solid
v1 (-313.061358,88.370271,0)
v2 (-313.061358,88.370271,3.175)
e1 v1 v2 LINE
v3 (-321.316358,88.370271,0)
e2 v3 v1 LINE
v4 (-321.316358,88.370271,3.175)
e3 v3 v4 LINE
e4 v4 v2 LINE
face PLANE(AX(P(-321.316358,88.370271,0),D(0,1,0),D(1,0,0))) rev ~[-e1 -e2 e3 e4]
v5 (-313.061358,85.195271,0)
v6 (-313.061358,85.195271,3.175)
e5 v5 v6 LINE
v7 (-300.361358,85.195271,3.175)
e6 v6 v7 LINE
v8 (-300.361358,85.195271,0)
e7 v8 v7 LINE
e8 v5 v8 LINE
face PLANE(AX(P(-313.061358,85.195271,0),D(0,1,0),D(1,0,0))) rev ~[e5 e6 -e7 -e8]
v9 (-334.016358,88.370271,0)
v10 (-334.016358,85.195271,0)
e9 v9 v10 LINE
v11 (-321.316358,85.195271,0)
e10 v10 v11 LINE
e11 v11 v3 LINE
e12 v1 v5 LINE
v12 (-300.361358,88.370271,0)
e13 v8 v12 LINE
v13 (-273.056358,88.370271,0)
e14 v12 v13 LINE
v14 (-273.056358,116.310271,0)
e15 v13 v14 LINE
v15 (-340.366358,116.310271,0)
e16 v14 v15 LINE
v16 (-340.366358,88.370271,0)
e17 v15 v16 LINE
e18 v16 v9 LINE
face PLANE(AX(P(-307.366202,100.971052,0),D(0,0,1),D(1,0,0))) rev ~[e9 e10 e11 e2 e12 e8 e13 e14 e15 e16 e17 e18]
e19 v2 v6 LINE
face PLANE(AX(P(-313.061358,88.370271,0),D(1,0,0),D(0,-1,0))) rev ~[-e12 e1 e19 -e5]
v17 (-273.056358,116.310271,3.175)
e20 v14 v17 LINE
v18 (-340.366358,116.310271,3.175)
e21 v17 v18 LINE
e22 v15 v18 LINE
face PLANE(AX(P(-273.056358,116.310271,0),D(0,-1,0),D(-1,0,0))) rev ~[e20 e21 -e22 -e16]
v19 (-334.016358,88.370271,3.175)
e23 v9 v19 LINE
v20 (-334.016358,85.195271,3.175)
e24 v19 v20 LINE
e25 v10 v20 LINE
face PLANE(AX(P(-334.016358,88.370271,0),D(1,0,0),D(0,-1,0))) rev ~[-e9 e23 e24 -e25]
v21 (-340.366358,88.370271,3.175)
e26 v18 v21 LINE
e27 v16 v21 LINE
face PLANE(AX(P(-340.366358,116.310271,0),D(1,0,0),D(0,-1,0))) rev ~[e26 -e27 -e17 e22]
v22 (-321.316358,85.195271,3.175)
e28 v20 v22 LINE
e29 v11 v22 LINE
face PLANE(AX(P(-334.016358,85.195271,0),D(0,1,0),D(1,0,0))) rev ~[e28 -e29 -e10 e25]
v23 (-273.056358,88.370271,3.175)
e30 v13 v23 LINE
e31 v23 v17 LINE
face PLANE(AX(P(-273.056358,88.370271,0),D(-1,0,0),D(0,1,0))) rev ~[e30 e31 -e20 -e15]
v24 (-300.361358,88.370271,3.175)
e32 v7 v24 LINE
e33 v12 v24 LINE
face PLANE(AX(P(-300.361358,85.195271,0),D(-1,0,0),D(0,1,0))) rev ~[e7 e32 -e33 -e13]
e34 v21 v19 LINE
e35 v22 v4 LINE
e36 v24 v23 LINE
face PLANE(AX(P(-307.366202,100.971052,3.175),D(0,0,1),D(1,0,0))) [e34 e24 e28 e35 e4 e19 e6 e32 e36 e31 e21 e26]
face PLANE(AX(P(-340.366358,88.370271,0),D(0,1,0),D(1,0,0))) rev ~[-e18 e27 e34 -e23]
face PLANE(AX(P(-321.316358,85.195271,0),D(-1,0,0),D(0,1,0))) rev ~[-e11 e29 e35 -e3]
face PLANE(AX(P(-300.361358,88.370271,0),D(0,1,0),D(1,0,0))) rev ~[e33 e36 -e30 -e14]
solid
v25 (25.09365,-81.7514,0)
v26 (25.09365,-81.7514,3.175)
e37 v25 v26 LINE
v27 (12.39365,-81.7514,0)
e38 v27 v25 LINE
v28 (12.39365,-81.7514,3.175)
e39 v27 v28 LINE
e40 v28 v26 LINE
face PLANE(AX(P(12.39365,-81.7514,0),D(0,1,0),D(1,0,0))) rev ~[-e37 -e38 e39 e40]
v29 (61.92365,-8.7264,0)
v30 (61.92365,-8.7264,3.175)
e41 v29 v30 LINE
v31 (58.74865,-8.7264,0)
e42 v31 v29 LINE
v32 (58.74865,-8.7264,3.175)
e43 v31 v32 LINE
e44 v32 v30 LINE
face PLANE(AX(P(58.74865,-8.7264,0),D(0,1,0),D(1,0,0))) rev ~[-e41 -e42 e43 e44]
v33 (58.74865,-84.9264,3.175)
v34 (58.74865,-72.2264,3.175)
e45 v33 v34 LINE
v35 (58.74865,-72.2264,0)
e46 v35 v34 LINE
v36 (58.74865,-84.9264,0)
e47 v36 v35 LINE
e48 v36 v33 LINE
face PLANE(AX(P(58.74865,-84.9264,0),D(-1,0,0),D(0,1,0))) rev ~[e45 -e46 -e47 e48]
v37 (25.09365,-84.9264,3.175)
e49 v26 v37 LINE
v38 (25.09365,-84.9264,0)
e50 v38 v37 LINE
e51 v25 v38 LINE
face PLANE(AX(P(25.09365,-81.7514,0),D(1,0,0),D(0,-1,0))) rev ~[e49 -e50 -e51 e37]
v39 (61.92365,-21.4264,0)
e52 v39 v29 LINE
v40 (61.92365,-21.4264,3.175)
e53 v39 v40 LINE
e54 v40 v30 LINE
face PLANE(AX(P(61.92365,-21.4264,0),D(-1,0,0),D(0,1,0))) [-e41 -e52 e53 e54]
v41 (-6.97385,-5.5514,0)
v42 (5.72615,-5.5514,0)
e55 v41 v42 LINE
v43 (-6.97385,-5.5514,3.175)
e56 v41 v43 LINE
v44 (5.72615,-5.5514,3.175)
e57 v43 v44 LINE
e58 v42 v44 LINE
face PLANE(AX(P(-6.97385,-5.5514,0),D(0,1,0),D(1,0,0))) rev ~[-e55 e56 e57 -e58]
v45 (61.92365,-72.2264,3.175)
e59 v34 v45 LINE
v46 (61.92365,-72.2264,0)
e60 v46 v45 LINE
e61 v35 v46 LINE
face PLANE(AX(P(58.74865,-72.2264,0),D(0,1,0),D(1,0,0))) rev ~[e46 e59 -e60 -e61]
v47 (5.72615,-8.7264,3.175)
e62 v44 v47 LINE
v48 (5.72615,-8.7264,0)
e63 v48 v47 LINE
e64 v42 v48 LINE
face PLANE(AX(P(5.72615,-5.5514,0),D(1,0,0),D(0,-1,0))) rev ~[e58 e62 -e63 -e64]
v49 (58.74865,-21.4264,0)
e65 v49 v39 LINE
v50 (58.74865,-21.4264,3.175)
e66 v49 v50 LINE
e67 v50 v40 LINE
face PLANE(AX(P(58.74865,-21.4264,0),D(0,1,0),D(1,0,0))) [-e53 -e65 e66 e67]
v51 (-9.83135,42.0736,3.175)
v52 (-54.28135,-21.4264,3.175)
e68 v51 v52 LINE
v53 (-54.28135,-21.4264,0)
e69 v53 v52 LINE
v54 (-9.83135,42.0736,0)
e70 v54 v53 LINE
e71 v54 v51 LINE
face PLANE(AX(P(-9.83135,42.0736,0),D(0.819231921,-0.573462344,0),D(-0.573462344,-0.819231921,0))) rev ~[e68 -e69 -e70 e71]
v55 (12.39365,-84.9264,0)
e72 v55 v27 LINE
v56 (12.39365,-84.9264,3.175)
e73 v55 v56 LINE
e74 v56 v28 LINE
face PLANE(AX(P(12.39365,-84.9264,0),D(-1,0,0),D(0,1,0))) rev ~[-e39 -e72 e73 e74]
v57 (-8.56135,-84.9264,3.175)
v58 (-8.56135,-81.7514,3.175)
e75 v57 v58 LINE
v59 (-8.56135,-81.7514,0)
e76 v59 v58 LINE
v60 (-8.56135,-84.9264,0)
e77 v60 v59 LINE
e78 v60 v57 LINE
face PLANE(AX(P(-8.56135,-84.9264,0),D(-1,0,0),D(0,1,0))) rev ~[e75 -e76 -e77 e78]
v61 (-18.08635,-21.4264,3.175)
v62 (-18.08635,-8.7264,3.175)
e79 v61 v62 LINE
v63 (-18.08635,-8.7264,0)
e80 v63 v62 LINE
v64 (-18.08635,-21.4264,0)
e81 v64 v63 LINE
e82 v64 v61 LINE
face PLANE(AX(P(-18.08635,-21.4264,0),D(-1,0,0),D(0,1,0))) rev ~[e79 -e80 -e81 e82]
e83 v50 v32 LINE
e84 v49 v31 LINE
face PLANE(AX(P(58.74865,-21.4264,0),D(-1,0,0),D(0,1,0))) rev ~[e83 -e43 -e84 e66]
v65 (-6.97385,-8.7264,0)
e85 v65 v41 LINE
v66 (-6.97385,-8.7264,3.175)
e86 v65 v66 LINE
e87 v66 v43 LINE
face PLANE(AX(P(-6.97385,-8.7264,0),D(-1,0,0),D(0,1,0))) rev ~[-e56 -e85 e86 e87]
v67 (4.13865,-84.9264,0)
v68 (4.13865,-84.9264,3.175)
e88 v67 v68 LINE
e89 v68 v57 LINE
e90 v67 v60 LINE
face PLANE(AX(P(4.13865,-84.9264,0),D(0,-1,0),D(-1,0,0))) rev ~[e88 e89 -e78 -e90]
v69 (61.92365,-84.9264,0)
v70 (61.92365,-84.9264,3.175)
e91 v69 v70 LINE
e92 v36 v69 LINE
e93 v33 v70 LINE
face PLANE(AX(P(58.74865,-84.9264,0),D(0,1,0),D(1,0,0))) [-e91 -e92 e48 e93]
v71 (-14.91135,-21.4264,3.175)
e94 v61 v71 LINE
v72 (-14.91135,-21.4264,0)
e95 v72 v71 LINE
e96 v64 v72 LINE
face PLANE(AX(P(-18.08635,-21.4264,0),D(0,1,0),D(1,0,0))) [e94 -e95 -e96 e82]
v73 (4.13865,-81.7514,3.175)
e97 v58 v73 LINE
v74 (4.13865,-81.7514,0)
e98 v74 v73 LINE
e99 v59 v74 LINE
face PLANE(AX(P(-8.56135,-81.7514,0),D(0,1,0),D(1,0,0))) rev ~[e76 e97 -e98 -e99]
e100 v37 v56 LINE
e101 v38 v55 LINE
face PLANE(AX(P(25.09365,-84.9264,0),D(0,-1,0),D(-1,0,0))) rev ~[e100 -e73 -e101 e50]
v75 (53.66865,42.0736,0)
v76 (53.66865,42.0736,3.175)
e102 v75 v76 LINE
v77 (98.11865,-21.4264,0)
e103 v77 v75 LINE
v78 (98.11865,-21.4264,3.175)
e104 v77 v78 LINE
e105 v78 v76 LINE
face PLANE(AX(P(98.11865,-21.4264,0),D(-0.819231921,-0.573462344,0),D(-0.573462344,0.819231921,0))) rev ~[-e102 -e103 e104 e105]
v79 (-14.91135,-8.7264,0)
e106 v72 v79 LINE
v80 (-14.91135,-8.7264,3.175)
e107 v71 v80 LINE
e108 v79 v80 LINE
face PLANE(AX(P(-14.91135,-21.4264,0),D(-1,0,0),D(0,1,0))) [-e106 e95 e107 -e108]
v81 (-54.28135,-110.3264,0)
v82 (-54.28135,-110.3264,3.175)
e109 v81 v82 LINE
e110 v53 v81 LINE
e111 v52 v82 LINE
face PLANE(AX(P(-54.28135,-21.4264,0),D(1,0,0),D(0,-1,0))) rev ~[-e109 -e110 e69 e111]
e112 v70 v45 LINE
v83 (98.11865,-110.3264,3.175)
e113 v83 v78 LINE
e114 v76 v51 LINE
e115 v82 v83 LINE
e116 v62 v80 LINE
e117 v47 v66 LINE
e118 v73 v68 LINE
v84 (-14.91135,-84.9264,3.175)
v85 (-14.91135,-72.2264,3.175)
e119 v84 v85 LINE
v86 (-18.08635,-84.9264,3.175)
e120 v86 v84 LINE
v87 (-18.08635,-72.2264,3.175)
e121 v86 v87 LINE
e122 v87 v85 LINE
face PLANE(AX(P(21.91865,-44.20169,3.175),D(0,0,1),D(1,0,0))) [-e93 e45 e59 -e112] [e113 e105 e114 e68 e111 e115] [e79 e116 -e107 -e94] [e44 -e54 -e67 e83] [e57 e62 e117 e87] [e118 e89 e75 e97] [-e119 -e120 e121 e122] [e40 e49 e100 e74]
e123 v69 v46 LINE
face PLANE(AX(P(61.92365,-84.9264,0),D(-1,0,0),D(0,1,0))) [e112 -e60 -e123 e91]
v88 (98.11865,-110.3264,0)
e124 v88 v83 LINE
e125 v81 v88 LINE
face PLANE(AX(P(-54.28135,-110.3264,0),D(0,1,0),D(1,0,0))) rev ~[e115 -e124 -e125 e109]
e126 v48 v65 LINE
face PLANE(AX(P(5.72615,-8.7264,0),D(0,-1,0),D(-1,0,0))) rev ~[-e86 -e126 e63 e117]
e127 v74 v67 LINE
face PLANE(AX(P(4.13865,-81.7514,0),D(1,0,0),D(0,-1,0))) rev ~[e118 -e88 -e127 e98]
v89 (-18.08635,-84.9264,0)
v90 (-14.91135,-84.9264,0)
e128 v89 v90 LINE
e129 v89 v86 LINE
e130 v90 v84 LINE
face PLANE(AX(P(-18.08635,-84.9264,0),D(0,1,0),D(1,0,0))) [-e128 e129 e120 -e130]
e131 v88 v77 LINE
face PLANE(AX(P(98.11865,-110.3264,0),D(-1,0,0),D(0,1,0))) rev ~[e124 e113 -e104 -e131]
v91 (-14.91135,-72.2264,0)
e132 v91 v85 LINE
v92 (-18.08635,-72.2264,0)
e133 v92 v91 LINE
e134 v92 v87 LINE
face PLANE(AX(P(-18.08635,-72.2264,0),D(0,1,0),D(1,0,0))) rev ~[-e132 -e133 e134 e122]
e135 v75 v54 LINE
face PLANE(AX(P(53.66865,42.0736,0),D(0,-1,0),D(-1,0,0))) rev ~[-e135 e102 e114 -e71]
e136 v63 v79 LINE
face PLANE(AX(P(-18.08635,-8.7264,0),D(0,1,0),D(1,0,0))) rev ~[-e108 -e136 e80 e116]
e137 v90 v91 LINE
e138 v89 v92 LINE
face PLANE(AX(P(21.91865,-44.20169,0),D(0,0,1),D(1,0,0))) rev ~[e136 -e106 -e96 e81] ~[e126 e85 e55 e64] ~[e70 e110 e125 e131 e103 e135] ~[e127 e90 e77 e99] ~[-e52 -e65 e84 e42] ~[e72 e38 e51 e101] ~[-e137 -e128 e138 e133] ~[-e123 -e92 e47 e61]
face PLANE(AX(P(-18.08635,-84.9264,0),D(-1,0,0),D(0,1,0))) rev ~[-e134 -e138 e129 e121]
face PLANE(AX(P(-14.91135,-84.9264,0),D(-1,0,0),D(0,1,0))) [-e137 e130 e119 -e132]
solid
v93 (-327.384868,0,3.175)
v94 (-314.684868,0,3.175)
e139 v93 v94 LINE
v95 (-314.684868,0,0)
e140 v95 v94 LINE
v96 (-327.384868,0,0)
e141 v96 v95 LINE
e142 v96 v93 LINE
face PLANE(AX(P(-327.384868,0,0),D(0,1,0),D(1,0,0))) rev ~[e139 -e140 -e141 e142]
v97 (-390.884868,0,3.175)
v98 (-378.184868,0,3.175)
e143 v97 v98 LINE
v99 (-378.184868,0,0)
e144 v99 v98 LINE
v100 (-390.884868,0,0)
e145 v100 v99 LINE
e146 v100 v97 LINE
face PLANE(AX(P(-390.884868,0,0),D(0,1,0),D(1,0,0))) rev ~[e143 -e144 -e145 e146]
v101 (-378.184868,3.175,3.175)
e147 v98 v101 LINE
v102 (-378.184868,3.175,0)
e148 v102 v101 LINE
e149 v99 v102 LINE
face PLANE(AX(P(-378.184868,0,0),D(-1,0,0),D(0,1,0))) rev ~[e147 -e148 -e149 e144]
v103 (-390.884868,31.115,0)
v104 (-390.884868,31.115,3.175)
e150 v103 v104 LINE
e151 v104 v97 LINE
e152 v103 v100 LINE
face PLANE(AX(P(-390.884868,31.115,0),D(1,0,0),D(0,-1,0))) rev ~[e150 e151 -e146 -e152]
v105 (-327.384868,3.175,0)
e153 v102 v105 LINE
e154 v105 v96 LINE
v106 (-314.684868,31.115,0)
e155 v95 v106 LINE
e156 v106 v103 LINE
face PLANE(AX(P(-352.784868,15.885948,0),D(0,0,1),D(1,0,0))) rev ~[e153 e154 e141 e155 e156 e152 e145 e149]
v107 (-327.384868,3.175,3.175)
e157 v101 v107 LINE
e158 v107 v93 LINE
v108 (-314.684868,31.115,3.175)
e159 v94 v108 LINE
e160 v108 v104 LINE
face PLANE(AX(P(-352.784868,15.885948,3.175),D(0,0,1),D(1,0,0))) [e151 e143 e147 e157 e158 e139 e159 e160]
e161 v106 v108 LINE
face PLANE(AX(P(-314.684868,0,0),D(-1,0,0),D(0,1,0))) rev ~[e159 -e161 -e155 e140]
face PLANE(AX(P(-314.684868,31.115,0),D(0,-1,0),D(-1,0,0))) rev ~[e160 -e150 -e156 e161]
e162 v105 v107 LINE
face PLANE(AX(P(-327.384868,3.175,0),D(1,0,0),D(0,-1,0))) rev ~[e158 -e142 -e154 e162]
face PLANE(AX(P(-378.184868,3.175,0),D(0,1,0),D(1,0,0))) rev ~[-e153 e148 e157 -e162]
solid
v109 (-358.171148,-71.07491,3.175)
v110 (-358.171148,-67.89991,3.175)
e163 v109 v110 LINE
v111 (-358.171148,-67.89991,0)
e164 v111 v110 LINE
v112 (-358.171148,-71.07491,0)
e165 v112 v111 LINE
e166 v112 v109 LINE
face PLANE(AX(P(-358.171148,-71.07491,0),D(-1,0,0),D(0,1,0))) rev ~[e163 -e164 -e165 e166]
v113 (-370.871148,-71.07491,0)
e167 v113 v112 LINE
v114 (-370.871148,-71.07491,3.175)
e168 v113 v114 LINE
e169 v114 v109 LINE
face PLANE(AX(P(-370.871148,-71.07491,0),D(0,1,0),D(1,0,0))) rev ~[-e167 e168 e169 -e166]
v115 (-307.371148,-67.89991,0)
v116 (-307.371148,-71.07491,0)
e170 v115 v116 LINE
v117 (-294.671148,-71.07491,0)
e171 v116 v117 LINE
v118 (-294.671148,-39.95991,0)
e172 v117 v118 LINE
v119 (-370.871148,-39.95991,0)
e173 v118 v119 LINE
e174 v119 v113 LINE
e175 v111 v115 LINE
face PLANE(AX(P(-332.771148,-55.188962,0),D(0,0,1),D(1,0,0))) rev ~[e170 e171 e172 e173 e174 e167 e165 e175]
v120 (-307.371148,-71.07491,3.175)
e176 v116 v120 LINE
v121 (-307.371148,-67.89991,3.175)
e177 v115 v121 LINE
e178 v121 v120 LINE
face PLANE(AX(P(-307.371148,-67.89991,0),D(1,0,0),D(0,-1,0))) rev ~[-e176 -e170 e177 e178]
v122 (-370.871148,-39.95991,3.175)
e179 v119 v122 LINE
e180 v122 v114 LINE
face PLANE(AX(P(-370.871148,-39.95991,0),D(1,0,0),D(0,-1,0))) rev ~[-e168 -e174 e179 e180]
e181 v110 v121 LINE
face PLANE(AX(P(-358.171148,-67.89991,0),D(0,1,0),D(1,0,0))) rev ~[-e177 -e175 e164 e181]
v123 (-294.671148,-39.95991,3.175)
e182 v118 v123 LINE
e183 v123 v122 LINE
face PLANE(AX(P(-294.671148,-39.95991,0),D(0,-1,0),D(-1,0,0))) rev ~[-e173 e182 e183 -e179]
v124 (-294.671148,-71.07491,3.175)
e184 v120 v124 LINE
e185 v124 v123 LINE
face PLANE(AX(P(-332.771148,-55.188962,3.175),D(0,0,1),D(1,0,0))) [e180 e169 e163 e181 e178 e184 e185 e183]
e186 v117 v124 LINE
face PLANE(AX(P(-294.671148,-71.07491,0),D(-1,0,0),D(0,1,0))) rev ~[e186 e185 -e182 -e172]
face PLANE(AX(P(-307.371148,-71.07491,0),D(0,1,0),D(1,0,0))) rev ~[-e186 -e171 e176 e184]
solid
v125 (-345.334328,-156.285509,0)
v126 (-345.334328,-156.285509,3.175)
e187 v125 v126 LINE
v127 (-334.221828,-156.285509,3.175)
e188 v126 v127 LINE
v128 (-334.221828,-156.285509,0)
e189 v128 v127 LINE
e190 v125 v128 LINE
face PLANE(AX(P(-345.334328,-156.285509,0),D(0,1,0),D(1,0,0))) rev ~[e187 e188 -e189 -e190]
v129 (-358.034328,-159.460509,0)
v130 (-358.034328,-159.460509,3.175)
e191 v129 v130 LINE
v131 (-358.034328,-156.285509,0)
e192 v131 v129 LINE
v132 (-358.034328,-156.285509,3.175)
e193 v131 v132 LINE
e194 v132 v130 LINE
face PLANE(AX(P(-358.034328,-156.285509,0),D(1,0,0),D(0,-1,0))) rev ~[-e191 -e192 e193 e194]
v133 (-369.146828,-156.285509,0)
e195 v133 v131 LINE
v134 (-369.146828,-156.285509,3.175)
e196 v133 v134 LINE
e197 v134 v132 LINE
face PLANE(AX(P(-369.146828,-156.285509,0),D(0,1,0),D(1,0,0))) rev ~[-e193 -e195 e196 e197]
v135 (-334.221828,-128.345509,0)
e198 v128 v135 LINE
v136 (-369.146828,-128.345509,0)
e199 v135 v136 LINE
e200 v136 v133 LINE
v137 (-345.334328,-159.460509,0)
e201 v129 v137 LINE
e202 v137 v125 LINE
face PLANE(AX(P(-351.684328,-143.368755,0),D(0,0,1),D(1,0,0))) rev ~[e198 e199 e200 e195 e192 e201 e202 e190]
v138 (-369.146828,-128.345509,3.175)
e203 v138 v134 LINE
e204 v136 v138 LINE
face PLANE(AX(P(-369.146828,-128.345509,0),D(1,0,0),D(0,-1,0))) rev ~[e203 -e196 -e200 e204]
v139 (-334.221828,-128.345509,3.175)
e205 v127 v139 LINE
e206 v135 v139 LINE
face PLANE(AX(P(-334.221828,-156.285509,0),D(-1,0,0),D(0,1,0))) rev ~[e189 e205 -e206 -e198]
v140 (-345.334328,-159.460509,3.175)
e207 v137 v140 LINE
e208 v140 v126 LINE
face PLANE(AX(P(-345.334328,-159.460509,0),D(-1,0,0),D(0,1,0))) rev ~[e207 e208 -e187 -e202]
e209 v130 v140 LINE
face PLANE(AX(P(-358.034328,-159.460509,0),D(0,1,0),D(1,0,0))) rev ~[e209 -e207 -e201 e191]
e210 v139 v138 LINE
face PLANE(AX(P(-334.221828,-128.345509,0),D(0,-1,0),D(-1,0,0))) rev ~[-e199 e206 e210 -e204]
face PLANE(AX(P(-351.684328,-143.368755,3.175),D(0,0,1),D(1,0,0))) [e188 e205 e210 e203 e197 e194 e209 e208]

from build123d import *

# Parameters (mm, degrees)
F2_DEPTH = 3.175
F0_W     = 3.175
F0_H     = 12.7
F3_DEPTH = 3.175


# Not quite as in the source:
# - a feature names something its author has since deleted; it is built from what else it names


with BuildPart() as f2:
    # F1 (on Top) → F2 (new body)
    with BuildSketch(Plane.XY):
        Polygon((-273.056358099, 116.3102710271), (-340.366358099, 116.3102710271), (-340.366358099, 88.3702710271), (-334.016358099, 88.3702710271), (-334.016358099, 85.1952710271), (-321.316358099, 85.1952710271), (-321.316358099, 88.3702710271), (-313.061358099, 88.3702710271), (-313.061358099, 85.1952710271), (-300.361358099, 85.1952710271), (-300.361358099, 88.3702710271), (-273.056358099, 88.3702710271), align=None)
    extrude(amount=F2_DEPTH)


with BuildPart() as f2b:
    # F1 (on Top) → F2, piece 2 (new body)
    with BuildSketch(Plane.XY):
        Polygon((-314.6848678589, 31.115), (-390.8848678589, 31.115), (-390.8848678589, 3.175), (-390.8848678589, 0), (-378.1848678589, 0), (-378.1848678589, 3.175), (-327.3848678589, 3.175), (-327.3848678589, 0), (-314.6848678589, 0), (-314.6848678589, 3.175), align=None)
    extrude(amount=F2_DEPTH)


with BuildPart() as f2c:
    # F1 (on Top) → F2, piece 3 (new body)
    with BuildSketch(Plane.XY):
        Polygon((-294.6711480618, -39.9599104619), (-370.8711480618, -39.9599104619), (-370.8711480618, -67.8999104619), (-370.8711480618, -71.0749104619), (-358.1711480618, -71.0749104619), (-358.1711480618, -67.8999104619), (-307.3711480618, -67.8999104619), (-307.3711480618, -71.0749104619), (-294.6711480618, -71.0749104619), (-294.6711480618, -67.8999104619), align=None)
    extrude(amount=F2_DEPTH)


with BuildPart() as f2d:
    # F1 (on Top) → F2, piece 4 (new body)
    with BuildSketch(Plane.XY):
        Polygon((-334.2218278885, -128.3455094671), (-369.1468278885, -128.3455094671), (-369.1468278885, -156.2855094671), (-358.0343278885, -156.2855094671), (-358.0343278885, -159.4605094671), (-345.3343278885, -159.4605094671), (-345.3343278885, -156.2855094671), (-334.2218278885, -156.2855094671), align=None)
    extrude(amount=F2_DEPTH)


with BuildPart() as f3:
    # F0 (on Top) → F3 (new body)
    with BuildSketch(Plane.XY):
        Polygon((-54.2813502252, -26.5063998628), (-54.2813502252, -110.3263998628), (-41.5813502252, -110.3263998628), (-18.0863502252, -110.3263998628), (0, -110.3263998628), (21.9186497748, -110.3263998628), (53.6686497748, -110.3263998628), (85.4186497748, -110.3263998628), (98.1186497748, -110.3263998628), (98.1186497748, -98.0041697621), (98.1186497748, -34.1263998628), (98.1186497748, -26.5063998628), (98.1186497748, -21.4263998628), (53.6686497748, 42.0736001372), (-9.8313502252, 42.0736001372), (-54.2813502252, -21.4263998628), align=None)
        with Locations((-16.4988502252, -78.5763998628)):
            Rectangle(F0_W, F0_H, mode=Mode.SUBTRACT)
        Polygon((4.1386497748, -84.9263998628), (-2.2113502252, -84.9263998628), (-8.5613502252, -84.9263998628), (-8.5613502252, -81.7513998628), (4.1386497748, -81.7513998628), align=None, mode=Mode.SUBTRACT)
        Polygon((25.0936497748, -84.9263998628), (18.7436497748, -84.9263998628), (12.3936497748, -84.9263998628), (12.3936497748, -81.7513998628), (25.0936497748, -81.7513998628), align=None, mode=Mode.SUBTRACT)
        with Locations((60.3361497748, -78.5763998628)):
            Rectangle(F0_W, F0_H, mode=Mode.SUBTRACT)
        with Locations((-16.4988502252, -15.0763998628)):
            Rectangle(F0_W, F0_H, mode=Mode.SUBTRACT)
        Polygon((5.7261497748, -8.7263998628), (-0.6238502252, -8.7263998628), (-6.9738502252, -8.7263998628), (-6.9738502252, -5.5513998628), (5.7261497748, -5.5513998628), align=None, mode=Mode.SUBTRACT)
        with Locations((60.3361497748, -15.0763998628)):
            Rectangle(F0_W, F0_H, mode=Mode.SUBTRACT)
    extrude(amount=F3_DEPTH)


solid = Compound([f2.part, f2b.part, f2c.part, f2d.part, f3.part])
